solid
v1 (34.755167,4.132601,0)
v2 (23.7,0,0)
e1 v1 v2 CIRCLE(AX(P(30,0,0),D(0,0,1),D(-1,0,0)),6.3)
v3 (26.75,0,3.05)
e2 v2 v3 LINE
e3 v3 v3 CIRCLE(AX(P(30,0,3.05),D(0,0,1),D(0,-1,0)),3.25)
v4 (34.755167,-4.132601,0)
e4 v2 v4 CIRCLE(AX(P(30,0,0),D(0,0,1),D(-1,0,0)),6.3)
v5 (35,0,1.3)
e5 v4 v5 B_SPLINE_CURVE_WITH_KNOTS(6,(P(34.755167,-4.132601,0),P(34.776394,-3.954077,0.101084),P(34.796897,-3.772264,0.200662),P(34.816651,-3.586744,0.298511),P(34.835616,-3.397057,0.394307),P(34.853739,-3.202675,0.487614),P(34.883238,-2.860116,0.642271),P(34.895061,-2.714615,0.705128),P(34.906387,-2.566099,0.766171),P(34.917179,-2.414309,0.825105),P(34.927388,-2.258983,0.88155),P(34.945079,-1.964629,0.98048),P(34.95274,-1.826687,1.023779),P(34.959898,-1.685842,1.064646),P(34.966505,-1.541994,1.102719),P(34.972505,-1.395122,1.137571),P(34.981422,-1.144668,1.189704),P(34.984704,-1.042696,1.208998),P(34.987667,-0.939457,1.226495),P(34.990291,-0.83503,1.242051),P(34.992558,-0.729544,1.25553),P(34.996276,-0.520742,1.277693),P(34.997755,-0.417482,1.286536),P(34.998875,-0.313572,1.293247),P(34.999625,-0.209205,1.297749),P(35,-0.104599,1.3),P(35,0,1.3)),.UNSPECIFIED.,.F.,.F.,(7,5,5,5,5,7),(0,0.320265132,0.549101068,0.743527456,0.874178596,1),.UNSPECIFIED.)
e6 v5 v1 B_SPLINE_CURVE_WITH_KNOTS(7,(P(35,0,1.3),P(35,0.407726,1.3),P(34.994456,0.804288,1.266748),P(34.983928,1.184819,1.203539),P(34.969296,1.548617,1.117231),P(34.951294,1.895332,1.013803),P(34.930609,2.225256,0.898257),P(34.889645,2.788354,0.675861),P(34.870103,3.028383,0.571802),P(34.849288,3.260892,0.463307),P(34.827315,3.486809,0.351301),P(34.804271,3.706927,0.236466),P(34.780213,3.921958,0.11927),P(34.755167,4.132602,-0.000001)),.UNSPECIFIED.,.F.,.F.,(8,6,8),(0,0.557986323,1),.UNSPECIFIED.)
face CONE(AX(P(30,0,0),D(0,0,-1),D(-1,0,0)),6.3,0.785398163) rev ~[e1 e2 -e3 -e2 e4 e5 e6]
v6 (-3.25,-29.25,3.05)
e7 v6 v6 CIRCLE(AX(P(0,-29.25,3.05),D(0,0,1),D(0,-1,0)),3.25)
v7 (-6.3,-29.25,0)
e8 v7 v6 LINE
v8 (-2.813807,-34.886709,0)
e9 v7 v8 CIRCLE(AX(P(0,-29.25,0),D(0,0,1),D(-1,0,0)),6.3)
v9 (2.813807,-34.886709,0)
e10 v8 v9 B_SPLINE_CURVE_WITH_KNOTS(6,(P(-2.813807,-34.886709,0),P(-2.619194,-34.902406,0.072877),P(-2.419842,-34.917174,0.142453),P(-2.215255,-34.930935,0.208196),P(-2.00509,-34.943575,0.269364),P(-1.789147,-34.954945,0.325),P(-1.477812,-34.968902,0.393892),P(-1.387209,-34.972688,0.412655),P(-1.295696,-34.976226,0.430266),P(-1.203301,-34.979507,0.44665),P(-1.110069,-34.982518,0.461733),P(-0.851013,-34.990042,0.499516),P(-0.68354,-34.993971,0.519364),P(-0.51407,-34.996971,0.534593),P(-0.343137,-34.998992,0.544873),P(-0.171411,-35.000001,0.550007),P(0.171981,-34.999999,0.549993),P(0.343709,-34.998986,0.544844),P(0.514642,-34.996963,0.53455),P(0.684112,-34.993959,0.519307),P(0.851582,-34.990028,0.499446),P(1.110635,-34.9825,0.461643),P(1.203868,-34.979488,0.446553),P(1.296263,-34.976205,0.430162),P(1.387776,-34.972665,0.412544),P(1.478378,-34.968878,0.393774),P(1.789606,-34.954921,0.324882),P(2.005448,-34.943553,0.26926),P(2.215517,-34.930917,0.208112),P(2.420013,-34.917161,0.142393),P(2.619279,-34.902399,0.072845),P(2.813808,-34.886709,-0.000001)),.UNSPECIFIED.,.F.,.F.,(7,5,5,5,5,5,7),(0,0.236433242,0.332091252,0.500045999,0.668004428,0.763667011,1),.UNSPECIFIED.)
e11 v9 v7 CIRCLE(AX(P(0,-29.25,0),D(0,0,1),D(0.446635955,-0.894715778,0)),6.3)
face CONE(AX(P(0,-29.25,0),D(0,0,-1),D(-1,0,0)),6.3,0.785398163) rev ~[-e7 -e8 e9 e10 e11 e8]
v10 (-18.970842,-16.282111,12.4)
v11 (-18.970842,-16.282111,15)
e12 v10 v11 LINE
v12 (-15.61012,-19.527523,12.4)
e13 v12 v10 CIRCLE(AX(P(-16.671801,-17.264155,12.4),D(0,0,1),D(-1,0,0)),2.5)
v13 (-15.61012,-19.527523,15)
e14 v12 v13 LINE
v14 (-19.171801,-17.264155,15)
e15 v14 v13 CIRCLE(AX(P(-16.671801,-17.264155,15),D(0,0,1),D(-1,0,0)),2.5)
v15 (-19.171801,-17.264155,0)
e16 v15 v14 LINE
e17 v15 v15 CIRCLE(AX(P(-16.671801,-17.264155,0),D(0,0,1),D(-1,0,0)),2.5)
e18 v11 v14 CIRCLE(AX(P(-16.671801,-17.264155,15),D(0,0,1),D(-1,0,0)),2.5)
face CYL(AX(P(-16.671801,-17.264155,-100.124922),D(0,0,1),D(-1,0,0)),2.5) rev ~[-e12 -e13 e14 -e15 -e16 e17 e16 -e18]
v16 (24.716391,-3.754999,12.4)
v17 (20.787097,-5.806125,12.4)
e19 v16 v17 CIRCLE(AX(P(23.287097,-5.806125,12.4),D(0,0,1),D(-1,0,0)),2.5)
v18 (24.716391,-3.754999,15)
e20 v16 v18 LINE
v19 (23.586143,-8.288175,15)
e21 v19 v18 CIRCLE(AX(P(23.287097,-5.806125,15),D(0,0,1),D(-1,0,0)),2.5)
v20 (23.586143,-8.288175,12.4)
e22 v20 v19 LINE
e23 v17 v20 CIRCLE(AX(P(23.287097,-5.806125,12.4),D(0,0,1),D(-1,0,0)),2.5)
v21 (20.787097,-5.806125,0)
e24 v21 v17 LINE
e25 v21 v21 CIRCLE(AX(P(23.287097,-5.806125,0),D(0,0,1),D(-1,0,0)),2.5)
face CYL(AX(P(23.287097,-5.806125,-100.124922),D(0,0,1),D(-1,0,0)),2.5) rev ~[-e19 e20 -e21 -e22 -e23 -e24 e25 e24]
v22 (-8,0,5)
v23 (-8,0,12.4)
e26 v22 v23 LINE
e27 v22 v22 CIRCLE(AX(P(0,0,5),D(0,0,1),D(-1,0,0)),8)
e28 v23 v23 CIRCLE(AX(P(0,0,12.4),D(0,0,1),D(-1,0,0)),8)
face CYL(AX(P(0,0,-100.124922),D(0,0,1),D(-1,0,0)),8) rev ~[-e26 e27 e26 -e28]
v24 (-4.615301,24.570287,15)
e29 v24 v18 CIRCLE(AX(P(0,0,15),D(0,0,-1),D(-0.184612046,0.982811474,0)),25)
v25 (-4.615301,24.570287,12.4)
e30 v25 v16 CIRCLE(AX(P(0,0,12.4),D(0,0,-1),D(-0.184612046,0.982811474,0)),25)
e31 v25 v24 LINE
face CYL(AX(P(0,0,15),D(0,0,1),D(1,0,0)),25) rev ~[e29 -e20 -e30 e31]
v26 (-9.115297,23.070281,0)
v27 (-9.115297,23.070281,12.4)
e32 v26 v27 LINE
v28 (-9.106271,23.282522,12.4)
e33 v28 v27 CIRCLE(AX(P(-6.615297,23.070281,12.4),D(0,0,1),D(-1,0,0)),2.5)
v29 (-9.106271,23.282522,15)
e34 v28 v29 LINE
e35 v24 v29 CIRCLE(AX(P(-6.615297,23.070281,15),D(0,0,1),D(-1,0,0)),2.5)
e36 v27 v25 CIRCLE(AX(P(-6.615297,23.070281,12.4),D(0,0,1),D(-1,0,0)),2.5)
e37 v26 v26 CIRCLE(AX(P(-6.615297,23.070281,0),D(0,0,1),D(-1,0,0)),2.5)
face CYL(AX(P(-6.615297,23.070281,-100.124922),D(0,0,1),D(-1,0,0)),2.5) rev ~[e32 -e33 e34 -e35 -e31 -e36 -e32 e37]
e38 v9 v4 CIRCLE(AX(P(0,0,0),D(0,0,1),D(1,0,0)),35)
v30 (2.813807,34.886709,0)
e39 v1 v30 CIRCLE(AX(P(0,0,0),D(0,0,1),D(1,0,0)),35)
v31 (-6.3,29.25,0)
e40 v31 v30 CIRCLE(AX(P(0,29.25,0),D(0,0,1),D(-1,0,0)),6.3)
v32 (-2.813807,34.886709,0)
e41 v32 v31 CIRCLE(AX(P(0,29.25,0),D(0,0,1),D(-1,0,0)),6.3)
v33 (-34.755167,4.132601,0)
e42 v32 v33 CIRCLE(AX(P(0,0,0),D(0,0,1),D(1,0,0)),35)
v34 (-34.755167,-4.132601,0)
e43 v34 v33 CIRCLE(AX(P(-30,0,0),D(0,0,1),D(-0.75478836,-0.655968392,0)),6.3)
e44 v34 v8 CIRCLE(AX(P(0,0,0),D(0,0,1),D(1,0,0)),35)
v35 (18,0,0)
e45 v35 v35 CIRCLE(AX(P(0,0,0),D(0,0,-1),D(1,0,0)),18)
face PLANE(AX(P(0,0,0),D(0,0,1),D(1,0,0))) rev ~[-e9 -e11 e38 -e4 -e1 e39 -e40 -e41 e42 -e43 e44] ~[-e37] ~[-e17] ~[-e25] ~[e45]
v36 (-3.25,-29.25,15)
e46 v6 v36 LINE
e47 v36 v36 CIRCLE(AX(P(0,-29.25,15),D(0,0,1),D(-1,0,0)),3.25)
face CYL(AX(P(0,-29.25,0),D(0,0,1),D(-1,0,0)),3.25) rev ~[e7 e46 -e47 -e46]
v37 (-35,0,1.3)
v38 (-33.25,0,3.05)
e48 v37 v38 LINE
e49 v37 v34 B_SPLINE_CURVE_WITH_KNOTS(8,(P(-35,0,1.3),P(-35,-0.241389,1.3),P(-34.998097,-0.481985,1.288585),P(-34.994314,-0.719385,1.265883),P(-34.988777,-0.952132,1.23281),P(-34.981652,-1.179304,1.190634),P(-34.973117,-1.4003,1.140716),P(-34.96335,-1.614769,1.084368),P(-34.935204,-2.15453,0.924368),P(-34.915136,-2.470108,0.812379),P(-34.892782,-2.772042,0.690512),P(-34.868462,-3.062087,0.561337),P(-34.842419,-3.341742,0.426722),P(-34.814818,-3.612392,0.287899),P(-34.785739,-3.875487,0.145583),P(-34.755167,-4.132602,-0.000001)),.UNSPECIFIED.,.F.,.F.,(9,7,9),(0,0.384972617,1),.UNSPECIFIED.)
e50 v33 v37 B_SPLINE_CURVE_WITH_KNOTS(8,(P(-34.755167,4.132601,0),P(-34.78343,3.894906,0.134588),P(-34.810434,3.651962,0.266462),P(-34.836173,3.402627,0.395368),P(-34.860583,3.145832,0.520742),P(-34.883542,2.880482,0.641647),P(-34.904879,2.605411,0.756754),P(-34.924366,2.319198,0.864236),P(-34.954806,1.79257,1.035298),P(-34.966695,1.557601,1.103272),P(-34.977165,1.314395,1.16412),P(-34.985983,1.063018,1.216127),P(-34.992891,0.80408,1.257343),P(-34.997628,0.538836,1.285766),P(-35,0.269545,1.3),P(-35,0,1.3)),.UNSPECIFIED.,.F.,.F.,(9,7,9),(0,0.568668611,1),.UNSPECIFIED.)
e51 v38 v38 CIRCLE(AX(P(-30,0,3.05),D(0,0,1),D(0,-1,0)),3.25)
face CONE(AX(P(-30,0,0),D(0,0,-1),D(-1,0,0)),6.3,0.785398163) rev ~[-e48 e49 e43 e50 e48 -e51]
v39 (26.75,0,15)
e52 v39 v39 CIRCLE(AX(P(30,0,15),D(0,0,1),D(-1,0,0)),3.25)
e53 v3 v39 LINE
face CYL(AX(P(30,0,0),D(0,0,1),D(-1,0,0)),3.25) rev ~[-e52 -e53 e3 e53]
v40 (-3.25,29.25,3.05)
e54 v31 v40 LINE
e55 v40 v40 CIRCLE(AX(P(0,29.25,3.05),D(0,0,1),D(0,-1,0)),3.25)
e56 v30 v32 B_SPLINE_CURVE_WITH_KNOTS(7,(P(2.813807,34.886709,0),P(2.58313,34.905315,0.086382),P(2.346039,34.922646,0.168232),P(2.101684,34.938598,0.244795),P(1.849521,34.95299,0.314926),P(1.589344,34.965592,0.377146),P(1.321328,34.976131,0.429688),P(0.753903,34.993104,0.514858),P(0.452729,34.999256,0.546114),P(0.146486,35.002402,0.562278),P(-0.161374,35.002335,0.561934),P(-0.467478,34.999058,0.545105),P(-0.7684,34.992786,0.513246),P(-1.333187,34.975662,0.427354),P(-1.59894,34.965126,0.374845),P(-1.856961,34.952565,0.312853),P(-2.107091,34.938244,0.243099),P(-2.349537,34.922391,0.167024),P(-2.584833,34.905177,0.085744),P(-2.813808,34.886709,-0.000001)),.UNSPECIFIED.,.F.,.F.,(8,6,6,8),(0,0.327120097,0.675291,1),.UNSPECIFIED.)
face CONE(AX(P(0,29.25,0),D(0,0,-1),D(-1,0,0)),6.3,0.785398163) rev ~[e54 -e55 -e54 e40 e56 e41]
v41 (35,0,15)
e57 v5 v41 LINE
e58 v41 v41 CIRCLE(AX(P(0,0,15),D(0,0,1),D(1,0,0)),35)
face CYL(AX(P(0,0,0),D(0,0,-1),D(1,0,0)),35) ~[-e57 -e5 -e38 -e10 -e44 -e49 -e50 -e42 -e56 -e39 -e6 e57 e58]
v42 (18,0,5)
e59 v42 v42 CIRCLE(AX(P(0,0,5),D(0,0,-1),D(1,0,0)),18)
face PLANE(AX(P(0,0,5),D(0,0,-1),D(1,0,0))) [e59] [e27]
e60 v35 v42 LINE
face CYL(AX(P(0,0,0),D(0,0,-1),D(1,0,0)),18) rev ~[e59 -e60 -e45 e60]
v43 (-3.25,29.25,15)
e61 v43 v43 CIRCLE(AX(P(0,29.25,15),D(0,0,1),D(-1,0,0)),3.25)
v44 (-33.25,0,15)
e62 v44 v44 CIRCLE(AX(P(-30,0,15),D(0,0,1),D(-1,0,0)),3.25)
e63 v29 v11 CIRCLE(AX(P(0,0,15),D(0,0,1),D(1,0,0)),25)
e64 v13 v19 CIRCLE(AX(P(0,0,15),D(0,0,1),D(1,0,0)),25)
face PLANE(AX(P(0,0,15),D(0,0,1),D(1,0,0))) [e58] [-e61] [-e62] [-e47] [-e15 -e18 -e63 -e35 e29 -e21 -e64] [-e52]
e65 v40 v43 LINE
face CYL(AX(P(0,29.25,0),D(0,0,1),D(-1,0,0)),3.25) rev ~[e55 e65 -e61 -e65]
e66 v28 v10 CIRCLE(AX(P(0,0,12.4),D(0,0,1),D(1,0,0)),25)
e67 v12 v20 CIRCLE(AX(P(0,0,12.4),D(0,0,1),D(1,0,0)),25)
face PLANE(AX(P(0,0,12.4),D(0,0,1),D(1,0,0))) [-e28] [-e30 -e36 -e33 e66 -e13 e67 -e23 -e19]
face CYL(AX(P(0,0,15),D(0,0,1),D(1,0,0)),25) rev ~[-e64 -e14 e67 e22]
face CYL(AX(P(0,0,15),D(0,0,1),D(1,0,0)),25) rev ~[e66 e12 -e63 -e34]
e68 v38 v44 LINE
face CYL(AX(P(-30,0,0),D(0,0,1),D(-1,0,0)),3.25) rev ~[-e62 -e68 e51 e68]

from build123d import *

# Parameters (mm, degrees)
F0_R           = 35
F1_DEPTH       = 15
F2_R           = 25
F3_DEPTH       = 2.6
F4_R           = 18
F5_DEPTH       = 5
F6_D           = 5
F7_D           = 6.5
F7_CSINK_D     = 12.6
F7_CSINK_ANGLE = 90
F8_D           = 16


with BuildPart() as f1:
    # F0 (on Top) → F1 (new body)
    with BuildSketch(Plane.XY):
        Circle(F0_R)
    extrude(amount=F1_DEPTH)

    # F2 (on face) → F3 (cut)
    with BuildSketch(Plane.XY.offset(15)):
        Circle(F2_R)
    extrude(amount=-F3_DEPTH, mode=Mode.SUBTRACT)

    # F4 (on face) → F5 (cut)
    with BuildSketch(Plane(origin=(0, 0, 0), x_dir=(1, 0, 0), z_dir=(0, 0, -1))):
        Circle(F4_R)
    extrude(amount=-F5_DEPTH, mode=Mode.SUBTRACT)

    # F6 (through all)
    with Locations(Plane(origin=(0, 0, 0), x_dir=(1, 0, 0), z_dir=(0, 0, -1))):
        with Locations((-6.6152965396, -23.0702807025), (-16.671800891, 17.2641552081), (23.2870974306, 5.8061254944)):
            Hole(F6_D / 2)

    # F7 (through all)
    with Locations(Plane(origin=(0, 0, 0), x_dir=(1, 0, 0), z_dir=(0, 0, -1))):
        with Locations((30, 0), (-30, 0), (0, -29.25), (0, 29.25)):
            CounterSinkHole(F7_D / 2, F7_CSINK_D / 2, counter_sink_angle=F7_CSINK_ANGLE)

    # F8 (through all)
    with Locations(Plane(origin=(0, 0, 0), x_dir=(1, 0, 0), z_dir=(0, 0, -1))):
        with Locations((0, 0)):
            Hole(F8_D / 2)


solid = f1.part
